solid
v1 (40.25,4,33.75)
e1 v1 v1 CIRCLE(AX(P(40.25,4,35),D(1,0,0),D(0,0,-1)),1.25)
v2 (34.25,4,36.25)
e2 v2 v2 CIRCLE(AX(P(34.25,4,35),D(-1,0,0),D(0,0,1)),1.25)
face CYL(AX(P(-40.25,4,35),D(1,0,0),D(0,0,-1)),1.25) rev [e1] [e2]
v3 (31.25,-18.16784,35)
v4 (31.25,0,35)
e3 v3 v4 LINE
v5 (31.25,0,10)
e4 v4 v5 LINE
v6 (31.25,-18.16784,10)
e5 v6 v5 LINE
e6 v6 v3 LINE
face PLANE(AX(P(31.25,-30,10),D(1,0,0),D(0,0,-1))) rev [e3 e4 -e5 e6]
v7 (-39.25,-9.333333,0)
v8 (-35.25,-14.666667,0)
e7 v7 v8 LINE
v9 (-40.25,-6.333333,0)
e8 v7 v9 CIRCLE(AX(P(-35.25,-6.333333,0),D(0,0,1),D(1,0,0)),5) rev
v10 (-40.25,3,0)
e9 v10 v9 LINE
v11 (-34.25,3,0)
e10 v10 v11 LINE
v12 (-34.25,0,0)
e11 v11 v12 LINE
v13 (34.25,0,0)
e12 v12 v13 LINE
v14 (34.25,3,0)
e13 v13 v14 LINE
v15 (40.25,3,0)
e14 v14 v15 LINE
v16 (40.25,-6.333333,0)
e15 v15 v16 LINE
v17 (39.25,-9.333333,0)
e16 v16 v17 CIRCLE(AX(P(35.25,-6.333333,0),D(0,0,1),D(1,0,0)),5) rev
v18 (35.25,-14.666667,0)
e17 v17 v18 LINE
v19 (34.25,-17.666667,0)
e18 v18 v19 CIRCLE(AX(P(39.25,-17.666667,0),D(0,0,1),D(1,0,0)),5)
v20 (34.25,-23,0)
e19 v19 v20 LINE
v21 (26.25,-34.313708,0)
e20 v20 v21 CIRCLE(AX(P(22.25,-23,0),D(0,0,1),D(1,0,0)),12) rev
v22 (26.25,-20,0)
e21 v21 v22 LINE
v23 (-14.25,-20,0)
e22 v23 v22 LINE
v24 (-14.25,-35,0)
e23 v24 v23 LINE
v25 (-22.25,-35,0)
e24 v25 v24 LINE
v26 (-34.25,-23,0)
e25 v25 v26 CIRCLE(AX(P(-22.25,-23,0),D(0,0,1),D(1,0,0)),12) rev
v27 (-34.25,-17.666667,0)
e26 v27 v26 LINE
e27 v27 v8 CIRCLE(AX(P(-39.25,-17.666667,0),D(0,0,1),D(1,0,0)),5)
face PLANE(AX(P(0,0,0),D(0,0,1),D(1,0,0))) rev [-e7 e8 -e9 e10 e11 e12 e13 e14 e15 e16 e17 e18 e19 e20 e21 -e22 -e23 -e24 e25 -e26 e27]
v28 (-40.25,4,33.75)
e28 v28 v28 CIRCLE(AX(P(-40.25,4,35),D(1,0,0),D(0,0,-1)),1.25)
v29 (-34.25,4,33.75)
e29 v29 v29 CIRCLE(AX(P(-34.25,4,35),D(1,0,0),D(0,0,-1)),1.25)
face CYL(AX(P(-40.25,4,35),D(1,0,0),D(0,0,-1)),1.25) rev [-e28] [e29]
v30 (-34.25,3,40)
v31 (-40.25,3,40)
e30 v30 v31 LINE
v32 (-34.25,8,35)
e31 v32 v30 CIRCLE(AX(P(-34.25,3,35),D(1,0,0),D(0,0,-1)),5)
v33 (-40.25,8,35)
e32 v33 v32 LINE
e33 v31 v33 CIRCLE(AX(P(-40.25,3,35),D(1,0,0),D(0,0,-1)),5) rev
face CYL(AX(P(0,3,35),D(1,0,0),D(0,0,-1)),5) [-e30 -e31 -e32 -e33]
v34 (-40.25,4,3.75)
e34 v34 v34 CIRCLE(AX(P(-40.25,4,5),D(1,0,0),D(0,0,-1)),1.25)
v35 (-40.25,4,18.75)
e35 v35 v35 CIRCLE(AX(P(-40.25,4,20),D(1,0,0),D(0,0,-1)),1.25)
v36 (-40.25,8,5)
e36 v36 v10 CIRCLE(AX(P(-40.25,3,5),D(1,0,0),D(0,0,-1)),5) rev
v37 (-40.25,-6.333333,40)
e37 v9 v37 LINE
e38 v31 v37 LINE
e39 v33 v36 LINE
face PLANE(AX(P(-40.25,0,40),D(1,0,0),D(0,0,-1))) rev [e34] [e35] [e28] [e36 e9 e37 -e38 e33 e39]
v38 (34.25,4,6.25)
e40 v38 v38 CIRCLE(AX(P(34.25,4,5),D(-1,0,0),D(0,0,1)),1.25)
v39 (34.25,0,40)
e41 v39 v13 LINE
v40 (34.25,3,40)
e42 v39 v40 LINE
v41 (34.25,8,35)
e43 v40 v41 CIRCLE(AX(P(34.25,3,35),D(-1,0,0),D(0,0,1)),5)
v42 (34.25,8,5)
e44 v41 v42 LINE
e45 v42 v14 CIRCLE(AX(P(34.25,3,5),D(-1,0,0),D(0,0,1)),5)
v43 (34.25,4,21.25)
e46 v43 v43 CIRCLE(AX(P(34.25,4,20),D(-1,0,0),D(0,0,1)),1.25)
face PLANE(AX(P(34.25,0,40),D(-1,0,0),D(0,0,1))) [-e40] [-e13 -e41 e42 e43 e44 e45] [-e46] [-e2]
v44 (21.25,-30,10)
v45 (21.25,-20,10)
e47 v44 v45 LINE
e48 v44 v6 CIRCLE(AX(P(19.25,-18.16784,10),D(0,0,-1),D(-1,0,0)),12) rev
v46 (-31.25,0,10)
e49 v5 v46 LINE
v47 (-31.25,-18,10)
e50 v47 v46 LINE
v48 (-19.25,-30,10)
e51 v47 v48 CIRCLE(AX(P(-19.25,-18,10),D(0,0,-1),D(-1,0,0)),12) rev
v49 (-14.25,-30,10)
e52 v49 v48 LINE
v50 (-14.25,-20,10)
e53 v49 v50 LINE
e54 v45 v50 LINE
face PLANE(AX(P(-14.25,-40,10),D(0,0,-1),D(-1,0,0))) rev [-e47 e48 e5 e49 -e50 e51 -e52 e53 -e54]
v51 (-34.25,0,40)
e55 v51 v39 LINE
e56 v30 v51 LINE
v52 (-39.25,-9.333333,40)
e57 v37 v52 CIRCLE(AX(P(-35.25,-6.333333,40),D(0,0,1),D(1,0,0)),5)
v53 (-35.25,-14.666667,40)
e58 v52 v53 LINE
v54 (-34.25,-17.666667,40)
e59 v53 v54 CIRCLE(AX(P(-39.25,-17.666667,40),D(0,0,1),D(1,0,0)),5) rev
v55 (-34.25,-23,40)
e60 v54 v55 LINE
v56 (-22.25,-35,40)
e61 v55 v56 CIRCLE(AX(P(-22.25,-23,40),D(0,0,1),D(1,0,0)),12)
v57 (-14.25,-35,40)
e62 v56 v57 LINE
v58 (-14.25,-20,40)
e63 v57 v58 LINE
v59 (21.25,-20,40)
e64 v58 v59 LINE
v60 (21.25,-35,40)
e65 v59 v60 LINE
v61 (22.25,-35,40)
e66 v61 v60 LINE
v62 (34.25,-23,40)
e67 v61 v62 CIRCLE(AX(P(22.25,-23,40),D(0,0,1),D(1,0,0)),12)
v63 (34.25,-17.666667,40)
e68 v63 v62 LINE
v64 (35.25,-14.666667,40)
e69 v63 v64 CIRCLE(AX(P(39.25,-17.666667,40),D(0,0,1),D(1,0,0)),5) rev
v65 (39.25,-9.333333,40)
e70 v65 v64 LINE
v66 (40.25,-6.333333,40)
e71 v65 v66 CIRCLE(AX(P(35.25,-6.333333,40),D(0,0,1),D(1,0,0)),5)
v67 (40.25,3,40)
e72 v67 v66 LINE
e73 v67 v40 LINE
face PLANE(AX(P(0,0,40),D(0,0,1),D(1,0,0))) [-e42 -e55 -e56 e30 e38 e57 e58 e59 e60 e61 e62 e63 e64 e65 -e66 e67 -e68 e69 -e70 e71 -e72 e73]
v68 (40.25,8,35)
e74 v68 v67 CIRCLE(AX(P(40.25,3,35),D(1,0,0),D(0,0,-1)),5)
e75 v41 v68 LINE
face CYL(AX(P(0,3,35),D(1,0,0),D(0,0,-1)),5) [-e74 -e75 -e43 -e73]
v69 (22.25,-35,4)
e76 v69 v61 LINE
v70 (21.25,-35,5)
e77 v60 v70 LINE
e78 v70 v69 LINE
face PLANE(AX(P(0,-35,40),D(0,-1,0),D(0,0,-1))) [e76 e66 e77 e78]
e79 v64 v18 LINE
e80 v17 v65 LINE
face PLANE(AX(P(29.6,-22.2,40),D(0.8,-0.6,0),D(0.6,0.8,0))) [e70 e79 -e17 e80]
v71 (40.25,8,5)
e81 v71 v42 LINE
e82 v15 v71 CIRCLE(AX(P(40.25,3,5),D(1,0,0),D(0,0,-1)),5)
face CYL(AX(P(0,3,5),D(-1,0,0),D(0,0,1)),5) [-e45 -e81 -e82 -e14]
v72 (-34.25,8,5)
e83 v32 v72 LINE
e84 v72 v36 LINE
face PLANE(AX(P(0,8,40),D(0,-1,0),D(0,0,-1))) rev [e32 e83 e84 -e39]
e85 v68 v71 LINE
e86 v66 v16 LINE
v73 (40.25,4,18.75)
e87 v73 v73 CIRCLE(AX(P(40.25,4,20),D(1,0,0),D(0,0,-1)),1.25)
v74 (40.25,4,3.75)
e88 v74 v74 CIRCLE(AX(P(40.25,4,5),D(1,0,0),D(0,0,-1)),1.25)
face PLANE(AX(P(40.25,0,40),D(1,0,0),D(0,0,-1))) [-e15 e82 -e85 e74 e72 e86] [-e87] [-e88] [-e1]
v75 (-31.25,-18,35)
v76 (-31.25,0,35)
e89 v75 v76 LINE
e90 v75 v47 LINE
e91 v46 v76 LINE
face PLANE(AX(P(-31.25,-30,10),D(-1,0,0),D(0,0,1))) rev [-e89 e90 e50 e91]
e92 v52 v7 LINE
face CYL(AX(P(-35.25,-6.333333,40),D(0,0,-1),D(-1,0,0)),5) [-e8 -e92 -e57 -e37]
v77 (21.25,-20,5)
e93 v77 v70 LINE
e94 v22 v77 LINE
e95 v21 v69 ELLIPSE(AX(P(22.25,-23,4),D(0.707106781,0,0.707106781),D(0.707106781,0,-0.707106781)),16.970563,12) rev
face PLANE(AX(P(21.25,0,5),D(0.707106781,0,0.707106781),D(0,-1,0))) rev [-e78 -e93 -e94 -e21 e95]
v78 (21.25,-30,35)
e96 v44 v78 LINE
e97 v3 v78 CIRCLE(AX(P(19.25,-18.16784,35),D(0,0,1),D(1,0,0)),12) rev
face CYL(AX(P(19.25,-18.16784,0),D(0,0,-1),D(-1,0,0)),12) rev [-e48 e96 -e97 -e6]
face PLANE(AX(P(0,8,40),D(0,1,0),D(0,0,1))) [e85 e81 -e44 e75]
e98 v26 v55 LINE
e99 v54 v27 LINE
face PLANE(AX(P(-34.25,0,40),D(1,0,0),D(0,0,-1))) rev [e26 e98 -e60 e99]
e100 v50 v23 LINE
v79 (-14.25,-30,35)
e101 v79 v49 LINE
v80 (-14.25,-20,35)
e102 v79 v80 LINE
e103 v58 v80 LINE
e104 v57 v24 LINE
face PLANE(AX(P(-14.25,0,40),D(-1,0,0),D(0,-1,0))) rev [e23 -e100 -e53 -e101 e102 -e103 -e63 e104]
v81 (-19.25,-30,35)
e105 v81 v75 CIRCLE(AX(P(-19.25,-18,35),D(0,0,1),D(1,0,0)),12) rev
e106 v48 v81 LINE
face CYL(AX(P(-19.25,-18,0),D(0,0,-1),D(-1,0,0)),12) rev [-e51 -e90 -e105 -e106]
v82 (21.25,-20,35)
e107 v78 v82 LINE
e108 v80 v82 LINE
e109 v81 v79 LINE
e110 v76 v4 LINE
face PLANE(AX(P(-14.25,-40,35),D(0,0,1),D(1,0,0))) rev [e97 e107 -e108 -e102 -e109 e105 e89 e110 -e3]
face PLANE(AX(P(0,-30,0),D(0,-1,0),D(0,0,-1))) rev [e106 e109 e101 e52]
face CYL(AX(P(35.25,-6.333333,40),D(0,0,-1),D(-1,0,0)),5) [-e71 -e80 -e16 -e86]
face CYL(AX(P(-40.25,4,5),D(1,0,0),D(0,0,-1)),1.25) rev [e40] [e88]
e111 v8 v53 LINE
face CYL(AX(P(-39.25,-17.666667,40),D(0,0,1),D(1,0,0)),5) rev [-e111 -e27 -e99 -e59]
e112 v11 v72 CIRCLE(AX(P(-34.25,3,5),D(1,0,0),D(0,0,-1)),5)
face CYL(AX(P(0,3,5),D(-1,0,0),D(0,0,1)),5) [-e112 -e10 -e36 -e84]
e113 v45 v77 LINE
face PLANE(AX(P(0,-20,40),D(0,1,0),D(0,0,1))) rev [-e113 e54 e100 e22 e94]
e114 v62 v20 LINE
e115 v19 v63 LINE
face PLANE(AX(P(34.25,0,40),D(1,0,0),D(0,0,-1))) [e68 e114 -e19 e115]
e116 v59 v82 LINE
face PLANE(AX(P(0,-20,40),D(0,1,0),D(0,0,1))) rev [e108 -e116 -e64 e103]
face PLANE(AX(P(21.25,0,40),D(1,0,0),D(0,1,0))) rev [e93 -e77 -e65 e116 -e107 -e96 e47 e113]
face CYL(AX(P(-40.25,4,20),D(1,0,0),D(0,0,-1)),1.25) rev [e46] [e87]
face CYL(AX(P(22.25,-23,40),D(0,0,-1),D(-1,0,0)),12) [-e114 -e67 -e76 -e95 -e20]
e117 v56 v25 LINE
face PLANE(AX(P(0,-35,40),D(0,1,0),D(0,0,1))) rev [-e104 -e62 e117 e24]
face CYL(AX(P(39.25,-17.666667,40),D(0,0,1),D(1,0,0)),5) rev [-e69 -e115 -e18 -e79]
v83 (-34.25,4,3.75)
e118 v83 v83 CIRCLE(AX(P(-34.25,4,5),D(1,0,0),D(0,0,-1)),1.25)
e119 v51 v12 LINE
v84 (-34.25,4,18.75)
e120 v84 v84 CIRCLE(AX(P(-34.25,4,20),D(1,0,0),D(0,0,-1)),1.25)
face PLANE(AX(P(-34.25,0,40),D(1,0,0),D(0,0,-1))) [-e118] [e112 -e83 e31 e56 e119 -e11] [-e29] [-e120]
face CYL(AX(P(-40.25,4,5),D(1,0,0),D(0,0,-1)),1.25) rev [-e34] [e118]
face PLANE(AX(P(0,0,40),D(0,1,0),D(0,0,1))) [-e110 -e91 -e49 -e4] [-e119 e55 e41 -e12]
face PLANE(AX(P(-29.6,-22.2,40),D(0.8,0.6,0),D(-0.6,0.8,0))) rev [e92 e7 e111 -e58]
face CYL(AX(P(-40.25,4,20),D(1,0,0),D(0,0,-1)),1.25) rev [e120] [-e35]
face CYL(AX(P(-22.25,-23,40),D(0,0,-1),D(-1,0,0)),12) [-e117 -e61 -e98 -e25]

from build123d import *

# Parameters (mm, degrees)
BOSS_EXTRUDE1_DEPTH     = 40
SKETCH2_W               = 35.5
SKETCH2_H               = 25
CUT_EXTRUDE1_DEPTH      = 40
CUT_EXTRUDE2_DEPTH      = 67.671301922
CUT_EXTRUDE2_DEPTH_BACK = 67.671301922
SKETCH3_R               = 1.25
FILLET2_R               = 5
CHAMFER1_SIZE           = 5
SKETCH4_W               = 17
SKETCH4_H               = 25
SKETCH4_W_2             = 10
CUT_EXTRUDE3_DEPTH      = 30
FILLET3_R               = 12


with BuildPart() as part:
    # Sketch1 → Boss-Extrude1 (new body)
    with BuildSketch(Plane.XY):
        Polygon((-14.25, -20), (21.25, -20), (21.25, -35), (34.25, -35), (34.25, 0), (-34.25, 0), (-34.25, -35), (-14.25, -35), align=None)
        Polygon((-34.25, -16), (-34.25, 0), (-34.25, 8), (-40.25, 8), (-40.25, -8), align=None)
        Polygon((34.25, 8), (34.25, 0), (34.25, -16), (40.25, -8), (40.25, 8), align=None)
    extrude(amount=BOSS_EXTRUDE1_DEPTH)

    # Sketch2 → Cut-Extrude1 (cut)
    with BuildSketch(Plane(origin=(0, 0, 0), x_dir=(1, 0, 0), z_dir=(0, 1, 0))):
        with Locations((3.5, -22.5)):
            Rectangle(SKETCH2_W, SKETCH2_H)
    extrude(amount=-CUT_EXTRUDE1_DEPTH, mode=Mode.SUBTRACT)

    # Sketch3 → Cut-Extrude2 (cut, two sides: drawn at the far end of the back side and taken through both)
    with BuildSketch(Plane(origin=(0, 0, 0), x_dir=(0, 0, -1), z_dir=(1, 0, 0)).offset(-CUT_EXTRUDE2_DEPTH_BACK)):
        with Locations((-35, 4)):
            Circle(SKETCH3_R)
        with Locations((-5, 4)):
            Circle(SKETCH3_R)
        with Locations((-20, 4)):
            Circle(SKETCH3_R)
    extrude(amount=CUT_EXTRUDE2_DEPTH + CUT_EXTRUDE2_DEPTH_BACK, mode=Mode.SUBTRACT)

    # Fillet2
    fillet2_edges = [part.edges().sort_by_distance(p)[0] for p in [
        (-37.25, 8, 0),
        (37.25, 8, 0),
        (37.25, 8, 40),
        (-34.25, -16, 20),
        (-40.25, -8, 20),
        (40.25, -8, 20),
        (34.25, -16, 20),
        (-37.25, 8, 40),
    ]]
    fillet(fillet2_edges, radius=FILLET2_R)

    # Chamfer1
    chamfer1_edges = [part.edges().sort_by_distance(p)[0] for p in [
        (21.25, -27.5, 0),
    ]]
    chamfer(chamfer1_edges, length=CHAMFER1_SIZE)

    # Sketch4 → Cut-Extrude3 (cut)
    with BuildSketch(Plane(origin=(0, 0, 0), x_dir=(1, 0, 0), z_dir=(0, 1, 0))):
        with Locations((-22.75, -22.5)):
            Rectangle(SKETCH4_W, SKETCH4_H)
        with Locations((26.25, -22.5)):
            Rectangle(SKETCH4_W_2, SKETCH4_H)
    extrude(amount=-CUT_EXTRUDE3_DEPTH, mode=Mode.SUBTRACT)

    # Fillet3
    # the kernel refuses this fillet: 12 mm, written as the material it adds along each edge
    with BuildSketch(Plane(origin=(-31.25, -30, 10), x_dir=(0, 1, 0), z_dir=(0, 0, 1))) as fillet3_piece_1_section:
        with BuildLine():
            CenterArc((FILLET3_R, -FILLET3_R), FILLET3_R, 90, 90)
            Line((0, -FILLET3_R), (0, 0))
            Line((0, 0), (FILLET3_R, 0))
        make_face()
    fillet3_piece_1 = extrude(amount=55, mode=Mode.PRIVATE)
    fillet3_piece_1 = split(fillet3_piece_1, bisect_by=Plane(origin=(-31.25, -30, 40), z_dir=(0, 0, -1)), keep=Keep.TOP, mode=Mode.PRIVATE)
    add(fillet3_piece_1)
    with BuildSketch(Plane(origin=(31.25, -30, 10), x_dir=(0, 1, 0), z_dir=(0, 0, 1))) as fillet3_piece_2_section:
        with BuildLine():
            CenterArc((11.832159566, 12), FILLET3_R, 189.594068227, 80.405931773)
            Line((0, 10), (0, 0))
            Line((0, 0), (11.832159566, 0))
        make_face()
    fillet3_piece_2 = extrude(amount=54.580398916, mode=Mode.PRIVATE)
    fillet3_piece_2 = split(fillet3_piece_2, bisect_by=Plane(origin=(31.25, -30, 40), z_dir=(0, 0, -1)), keep=Keep.TOP, mode=Mode.PRIVATE)
    add(fillet3_piece_2)
    # the kernel refuses this fillet: 12 mm, written as the material it takes off along each edge
    with BuildSketch(Plane(origin=(-34.25, -35, -30), x_dir=(1, 0, 0), z_dir=(0, 0, 1)), Plane(origin=(34.25, -35, -30), x_dir=(0, 1, 0), z_dir=(0, 0, 1))) as fillet3_2_piece_1:
        with BuildLine():
            CenterArc((FILLET3_R, FILLET3_R), FILLET3_R, 180, 90)
            Line((0, FILLET3_R), (0, 0))
            Line((0, 0), (FILLET3_R, 0))
        make_face()
    extrude(amount=100, mode=Mode.SUBTRACT)


solid = part.part
